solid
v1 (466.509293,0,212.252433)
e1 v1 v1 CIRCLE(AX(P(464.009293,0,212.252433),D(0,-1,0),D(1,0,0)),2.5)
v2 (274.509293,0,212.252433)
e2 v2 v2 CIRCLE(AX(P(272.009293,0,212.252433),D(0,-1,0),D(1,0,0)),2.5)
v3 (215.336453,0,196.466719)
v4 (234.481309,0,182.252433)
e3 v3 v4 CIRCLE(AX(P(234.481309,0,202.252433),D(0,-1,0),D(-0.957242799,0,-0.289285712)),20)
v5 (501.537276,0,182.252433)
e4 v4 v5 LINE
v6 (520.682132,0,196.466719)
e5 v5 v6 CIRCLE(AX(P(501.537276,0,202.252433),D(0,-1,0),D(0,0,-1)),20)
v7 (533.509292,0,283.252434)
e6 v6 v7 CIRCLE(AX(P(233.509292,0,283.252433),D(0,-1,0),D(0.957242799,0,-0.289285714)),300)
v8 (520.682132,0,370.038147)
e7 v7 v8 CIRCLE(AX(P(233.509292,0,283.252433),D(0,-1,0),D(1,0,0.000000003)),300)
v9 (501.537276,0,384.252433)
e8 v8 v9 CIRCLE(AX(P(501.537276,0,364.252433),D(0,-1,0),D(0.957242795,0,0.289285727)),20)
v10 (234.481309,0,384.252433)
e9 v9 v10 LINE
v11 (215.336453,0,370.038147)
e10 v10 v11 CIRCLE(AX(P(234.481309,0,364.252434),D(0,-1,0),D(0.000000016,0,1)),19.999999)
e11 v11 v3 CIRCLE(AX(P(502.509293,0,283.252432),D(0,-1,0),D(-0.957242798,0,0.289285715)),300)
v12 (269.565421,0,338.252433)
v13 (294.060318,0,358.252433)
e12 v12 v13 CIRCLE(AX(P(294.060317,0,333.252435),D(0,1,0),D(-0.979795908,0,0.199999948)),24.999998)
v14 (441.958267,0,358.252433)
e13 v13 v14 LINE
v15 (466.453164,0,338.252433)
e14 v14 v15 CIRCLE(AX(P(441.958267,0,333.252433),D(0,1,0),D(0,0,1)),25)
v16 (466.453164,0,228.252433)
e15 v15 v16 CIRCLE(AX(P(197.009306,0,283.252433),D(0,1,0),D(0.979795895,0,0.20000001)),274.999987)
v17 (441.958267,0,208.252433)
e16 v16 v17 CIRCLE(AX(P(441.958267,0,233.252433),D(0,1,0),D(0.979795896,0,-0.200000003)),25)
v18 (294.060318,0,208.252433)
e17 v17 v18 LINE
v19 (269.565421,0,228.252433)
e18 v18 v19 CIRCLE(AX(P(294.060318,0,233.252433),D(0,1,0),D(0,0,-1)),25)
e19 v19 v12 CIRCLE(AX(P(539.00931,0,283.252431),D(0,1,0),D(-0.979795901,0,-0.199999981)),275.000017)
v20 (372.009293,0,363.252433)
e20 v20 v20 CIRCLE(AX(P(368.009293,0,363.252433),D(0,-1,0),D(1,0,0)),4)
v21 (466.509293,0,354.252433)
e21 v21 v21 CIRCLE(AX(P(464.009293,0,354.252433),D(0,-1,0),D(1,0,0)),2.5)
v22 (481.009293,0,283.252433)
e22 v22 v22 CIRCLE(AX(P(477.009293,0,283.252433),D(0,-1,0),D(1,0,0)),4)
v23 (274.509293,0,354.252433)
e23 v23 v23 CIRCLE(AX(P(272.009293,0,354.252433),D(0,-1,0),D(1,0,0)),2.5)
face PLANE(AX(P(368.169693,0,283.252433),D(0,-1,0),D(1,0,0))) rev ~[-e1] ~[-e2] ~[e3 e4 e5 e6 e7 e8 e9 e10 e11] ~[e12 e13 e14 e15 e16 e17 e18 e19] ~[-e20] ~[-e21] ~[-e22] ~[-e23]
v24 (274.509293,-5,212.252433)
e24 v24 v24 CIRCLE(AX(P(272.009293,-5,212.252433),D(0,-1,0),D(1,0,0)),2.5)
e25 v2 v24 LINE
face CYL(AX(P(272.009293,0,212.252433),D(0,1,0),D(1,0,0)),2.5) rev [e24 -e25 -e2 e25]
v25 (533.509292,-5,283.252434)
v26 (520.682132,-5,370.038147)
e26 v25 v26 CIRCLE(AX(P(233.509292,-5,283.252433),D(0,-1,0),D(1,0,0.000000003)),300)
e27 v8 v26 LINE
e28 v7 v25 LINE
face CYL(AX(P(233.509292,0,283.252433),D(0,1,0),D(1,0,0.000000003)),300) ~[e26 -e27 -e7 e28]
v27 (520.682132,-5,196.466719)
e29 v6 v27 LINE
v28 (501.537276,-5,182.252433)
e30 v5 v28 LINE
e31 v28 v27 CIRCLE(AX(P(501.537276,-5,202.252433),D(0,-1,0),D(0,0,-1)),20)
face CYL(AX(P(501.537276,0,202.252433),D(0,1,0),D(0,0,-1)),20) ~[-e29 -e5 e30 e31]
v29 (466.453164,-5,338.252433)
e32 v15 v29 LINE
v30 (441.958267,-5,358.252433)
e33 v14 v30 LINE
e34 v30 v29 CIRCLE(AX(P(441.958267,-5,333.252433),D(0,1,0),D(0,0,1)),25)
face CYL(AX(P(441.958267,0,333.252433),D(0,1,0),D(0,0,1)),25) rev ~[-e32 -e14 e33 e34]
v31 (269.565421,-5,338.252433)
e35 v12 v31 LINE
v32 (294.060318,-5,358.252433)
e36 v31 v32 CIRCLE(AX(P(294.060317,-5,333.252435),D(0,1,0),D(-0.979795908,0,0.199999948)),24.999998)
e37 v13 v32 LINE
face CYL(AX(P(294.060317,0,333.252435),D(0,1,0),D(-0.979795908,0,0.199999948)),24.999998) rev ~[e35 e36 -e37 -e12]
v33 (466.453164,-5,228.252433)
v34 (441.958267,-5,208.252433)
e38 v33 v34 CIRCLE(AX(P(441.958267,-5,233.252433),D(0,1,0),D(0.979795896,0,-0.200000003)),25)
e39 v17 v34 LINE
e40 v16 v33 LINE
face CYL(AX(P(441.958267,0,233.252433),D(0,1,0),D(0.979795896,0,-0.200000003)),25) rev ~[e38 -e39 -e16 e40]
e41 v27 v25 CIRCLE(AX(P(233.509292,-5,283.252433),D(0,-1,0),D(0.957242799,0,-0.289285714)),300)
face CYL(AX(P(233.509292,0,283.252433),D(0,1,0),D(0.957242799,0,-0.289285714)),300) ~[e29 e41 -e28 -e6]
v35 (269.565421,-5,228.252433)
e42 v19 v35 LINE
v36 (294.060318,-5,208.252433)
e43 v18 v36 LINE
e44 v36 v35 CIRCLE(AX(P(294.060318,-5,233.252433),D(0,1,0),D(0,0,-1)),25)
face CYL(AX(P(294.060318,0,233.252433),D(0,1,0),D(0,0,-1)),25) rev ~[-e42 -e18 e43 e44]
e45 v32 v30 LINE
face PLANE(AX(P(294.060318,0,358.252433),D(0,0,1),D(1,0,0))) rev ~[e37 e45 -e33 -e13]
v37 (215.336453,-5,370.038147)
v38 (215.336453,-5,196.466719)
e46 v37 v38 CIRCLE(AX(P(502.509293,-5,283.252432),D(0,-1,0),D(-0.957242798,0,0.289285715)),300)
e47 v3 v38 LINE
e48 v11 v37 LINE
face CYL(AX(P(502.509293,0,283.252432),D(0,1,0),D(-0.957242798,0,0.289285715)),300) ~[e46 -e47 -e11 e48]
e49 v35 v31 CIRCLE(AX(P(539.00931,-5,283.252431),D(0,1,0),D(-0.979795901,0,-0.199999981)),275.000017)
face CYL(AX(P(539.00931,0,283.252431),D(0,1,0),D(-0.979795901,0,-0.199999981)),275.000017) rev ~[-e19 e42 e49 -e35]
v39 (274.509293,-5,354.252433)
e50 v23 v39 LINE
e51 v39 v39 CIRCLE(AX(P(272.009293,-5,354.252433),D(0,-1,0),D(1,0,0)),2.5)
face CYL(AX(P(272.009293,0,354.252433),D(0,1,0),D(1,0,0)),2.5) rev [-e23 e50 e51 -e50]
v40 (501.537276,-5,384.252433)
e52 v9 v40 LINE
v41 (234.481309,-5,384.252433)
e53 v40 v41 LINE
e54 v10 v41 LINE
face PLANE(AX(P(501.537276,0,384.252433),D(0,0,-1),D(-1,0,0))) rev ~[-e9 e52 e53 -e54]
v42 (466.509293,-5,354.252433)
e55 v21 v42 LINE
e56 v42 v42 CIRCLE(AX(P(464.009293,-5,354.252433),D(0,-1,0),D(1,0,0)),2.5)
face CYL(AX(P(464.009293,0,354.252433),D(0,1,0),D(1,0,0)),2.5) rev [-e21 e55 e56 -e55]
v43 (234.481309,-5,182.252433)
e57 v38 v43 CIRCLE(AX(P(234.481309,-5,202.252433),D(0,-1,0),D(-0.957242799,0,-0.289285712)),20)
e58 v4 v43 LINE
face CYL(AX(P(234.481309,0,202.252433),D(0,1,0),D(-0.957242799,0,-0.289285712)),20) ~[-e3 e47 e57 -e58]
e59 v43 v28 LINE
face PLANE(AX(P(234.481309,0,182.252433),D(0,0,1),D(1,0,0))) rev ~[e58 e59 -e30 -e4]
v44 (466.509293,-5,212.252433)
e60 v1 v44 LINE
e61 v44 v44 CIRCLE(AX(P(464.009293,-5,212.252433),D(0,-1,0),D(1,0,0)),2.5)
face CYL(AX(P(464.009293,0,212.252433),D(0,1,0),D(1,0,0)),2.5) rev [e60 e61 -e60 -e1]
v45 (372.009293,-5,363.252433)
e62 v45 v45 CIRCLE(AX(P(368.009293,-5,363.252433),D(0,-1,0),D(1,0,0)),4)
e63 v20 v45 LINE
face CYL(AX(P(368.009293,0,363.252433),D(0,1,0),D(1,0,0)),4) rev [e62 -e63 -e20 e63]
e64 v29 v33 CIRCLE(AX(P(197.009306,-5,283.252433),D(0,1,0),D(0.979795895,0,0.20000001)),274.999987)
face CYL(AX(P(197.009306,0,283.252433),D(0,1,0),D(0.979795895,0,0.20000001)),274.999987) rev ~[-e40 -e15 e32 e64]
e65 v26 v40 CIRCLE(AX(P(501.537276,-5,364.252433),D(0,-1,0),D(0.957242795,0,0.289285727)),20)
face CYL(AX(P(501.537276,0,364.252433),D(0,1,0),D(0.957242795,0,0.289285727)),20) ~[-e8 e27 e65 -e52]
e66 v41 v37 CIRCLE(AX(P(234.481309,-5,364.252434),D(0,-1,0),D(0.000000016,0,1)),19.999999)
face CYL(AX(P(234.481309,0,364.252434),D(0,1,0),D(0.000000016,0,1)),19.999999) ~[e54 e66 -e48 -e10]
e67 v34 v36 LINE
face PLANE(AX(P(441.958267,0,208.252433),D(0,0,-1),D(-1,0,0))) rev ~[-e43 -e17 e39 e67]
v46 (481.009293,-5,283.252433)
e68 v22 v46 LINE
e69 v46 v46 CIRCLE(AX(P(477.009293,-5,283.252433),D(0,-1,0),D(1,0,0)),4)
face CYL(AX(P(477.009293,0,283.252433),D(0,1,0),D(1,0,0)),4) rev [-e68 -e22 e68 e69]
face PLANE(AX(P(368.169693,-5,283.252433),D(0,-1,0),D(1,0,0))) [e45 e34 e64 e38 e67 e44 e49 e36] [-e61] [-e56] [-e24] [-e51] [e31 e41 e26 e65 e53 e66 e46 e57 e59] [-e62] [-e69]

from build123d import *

# Parameters (mm, degrees)
F0_R     = 2.5
F0_R_2   = 4
F1_DEPTH = 5


# Not quite as in the source:
# - ends of sketch curves that miss each other by under 0.0002 mm in the source are joined


with BuildPart() as f1:
    # F0 (on Front) → F1 (new body)
    with BuildSketch(Plane.XZ):
        with BuildLine():
            ThreePointArc((215.3364533002, 370.0381469093), (202.5092928068, 283.2524328558), (215.3364530138, 196.4667187599))
            ThreePointArc((215.3364530138, 196.4667187599), (222.5589410473, 186.1945021744), (234.481309, 182.252433))
            Line((234.481309, 182.252433), (501.537276, 182.252433))
            ThreePointArc((501.537276, 182.252433), (513.4596440465, 186.1945022441), (520.6821320538, 196.4667189837))
            ThreePointArc((520.6821320538, 196.4667189837), (530.2851775529, 239.3881650909), (533.5092924377, 283.2524341717))
            ThreePointArc((533.5092924377, 283.2524341717), (530.2851774064, 327.11670224), (520.6821320538, 370.0381473561))
            ThreePointArc((520.6821320538, 370.0381473561), (513.4596440465, 380.3103637559), (501.537276, 384.252433))
            Line((501.537276, 384.252433), (234.481309, 384.252433))
            ThreePointArc((234.481309, 384.252433), (222.5589409535, 380.3103637559), (215.3364533002, 370.0381469093))
        make_face()
        with Locations((272.009293, 212.252433)):
            Circle(F0_R, mode=Mode.SUBTRACT)
        with BuildLine():
            ThreePointArc((466.4531644107, 228.2524329162), (457.7696552677, 213.8875162419), (441.958267, 208.252433))
            Line((441.958267, 208.252433), (294.060318, 208.252433))
            ThreePointArc((294.060318, 208.252433), (278.2489297323, 213.8875162419), (269.5654205893, 228.2524329162))
            ThreePointArc((269.5654205893, 228.2524329162), (264.009293, 283.252433), (269.5654212821, 338.2524329424))
            ThreePointArc((269.5654212821, 338.2524329424), (278.2489297323, 352.6173497581), (294.060318, 358.252433))
            Line((294.060318, 358.252433), (441.958267, 358.252433))
            ThreePointArc((441.958267, 358.252433), (457.7696552677, 352.6173497581), (466.4531644107, 338.2524330838))
            ThreePointArc((466.4531644107, 338.2524330838), (472.009293, 283.252433), (466.4531644107, 228.2524329162))
        make_face(mode=Mode.SUBTRACT)
        with Locations((272.009293, 354.252433)):
            Circle(F0_R, mode=Mode.SUBTRACT)
        with Locations((368.009293, 363.252433)):
            Circle(F0_R_2, mode=Mode.SUBTRACT)
        with Locations((464.009293, 212.252433)):
            Circle(F0_R, mode=Mode.SUBTRACT)
        with Locations((477.009293, 283.252433)):
            Circle(F0_R_2, mode=Mode.SUBTRACT)
        with Locations((464.009293, 354.252433)):
            Circle(F0_R, mode=Mode.SUBTRACT)
    extrude(amount=F1_DEPTH)


solid = f1.part
